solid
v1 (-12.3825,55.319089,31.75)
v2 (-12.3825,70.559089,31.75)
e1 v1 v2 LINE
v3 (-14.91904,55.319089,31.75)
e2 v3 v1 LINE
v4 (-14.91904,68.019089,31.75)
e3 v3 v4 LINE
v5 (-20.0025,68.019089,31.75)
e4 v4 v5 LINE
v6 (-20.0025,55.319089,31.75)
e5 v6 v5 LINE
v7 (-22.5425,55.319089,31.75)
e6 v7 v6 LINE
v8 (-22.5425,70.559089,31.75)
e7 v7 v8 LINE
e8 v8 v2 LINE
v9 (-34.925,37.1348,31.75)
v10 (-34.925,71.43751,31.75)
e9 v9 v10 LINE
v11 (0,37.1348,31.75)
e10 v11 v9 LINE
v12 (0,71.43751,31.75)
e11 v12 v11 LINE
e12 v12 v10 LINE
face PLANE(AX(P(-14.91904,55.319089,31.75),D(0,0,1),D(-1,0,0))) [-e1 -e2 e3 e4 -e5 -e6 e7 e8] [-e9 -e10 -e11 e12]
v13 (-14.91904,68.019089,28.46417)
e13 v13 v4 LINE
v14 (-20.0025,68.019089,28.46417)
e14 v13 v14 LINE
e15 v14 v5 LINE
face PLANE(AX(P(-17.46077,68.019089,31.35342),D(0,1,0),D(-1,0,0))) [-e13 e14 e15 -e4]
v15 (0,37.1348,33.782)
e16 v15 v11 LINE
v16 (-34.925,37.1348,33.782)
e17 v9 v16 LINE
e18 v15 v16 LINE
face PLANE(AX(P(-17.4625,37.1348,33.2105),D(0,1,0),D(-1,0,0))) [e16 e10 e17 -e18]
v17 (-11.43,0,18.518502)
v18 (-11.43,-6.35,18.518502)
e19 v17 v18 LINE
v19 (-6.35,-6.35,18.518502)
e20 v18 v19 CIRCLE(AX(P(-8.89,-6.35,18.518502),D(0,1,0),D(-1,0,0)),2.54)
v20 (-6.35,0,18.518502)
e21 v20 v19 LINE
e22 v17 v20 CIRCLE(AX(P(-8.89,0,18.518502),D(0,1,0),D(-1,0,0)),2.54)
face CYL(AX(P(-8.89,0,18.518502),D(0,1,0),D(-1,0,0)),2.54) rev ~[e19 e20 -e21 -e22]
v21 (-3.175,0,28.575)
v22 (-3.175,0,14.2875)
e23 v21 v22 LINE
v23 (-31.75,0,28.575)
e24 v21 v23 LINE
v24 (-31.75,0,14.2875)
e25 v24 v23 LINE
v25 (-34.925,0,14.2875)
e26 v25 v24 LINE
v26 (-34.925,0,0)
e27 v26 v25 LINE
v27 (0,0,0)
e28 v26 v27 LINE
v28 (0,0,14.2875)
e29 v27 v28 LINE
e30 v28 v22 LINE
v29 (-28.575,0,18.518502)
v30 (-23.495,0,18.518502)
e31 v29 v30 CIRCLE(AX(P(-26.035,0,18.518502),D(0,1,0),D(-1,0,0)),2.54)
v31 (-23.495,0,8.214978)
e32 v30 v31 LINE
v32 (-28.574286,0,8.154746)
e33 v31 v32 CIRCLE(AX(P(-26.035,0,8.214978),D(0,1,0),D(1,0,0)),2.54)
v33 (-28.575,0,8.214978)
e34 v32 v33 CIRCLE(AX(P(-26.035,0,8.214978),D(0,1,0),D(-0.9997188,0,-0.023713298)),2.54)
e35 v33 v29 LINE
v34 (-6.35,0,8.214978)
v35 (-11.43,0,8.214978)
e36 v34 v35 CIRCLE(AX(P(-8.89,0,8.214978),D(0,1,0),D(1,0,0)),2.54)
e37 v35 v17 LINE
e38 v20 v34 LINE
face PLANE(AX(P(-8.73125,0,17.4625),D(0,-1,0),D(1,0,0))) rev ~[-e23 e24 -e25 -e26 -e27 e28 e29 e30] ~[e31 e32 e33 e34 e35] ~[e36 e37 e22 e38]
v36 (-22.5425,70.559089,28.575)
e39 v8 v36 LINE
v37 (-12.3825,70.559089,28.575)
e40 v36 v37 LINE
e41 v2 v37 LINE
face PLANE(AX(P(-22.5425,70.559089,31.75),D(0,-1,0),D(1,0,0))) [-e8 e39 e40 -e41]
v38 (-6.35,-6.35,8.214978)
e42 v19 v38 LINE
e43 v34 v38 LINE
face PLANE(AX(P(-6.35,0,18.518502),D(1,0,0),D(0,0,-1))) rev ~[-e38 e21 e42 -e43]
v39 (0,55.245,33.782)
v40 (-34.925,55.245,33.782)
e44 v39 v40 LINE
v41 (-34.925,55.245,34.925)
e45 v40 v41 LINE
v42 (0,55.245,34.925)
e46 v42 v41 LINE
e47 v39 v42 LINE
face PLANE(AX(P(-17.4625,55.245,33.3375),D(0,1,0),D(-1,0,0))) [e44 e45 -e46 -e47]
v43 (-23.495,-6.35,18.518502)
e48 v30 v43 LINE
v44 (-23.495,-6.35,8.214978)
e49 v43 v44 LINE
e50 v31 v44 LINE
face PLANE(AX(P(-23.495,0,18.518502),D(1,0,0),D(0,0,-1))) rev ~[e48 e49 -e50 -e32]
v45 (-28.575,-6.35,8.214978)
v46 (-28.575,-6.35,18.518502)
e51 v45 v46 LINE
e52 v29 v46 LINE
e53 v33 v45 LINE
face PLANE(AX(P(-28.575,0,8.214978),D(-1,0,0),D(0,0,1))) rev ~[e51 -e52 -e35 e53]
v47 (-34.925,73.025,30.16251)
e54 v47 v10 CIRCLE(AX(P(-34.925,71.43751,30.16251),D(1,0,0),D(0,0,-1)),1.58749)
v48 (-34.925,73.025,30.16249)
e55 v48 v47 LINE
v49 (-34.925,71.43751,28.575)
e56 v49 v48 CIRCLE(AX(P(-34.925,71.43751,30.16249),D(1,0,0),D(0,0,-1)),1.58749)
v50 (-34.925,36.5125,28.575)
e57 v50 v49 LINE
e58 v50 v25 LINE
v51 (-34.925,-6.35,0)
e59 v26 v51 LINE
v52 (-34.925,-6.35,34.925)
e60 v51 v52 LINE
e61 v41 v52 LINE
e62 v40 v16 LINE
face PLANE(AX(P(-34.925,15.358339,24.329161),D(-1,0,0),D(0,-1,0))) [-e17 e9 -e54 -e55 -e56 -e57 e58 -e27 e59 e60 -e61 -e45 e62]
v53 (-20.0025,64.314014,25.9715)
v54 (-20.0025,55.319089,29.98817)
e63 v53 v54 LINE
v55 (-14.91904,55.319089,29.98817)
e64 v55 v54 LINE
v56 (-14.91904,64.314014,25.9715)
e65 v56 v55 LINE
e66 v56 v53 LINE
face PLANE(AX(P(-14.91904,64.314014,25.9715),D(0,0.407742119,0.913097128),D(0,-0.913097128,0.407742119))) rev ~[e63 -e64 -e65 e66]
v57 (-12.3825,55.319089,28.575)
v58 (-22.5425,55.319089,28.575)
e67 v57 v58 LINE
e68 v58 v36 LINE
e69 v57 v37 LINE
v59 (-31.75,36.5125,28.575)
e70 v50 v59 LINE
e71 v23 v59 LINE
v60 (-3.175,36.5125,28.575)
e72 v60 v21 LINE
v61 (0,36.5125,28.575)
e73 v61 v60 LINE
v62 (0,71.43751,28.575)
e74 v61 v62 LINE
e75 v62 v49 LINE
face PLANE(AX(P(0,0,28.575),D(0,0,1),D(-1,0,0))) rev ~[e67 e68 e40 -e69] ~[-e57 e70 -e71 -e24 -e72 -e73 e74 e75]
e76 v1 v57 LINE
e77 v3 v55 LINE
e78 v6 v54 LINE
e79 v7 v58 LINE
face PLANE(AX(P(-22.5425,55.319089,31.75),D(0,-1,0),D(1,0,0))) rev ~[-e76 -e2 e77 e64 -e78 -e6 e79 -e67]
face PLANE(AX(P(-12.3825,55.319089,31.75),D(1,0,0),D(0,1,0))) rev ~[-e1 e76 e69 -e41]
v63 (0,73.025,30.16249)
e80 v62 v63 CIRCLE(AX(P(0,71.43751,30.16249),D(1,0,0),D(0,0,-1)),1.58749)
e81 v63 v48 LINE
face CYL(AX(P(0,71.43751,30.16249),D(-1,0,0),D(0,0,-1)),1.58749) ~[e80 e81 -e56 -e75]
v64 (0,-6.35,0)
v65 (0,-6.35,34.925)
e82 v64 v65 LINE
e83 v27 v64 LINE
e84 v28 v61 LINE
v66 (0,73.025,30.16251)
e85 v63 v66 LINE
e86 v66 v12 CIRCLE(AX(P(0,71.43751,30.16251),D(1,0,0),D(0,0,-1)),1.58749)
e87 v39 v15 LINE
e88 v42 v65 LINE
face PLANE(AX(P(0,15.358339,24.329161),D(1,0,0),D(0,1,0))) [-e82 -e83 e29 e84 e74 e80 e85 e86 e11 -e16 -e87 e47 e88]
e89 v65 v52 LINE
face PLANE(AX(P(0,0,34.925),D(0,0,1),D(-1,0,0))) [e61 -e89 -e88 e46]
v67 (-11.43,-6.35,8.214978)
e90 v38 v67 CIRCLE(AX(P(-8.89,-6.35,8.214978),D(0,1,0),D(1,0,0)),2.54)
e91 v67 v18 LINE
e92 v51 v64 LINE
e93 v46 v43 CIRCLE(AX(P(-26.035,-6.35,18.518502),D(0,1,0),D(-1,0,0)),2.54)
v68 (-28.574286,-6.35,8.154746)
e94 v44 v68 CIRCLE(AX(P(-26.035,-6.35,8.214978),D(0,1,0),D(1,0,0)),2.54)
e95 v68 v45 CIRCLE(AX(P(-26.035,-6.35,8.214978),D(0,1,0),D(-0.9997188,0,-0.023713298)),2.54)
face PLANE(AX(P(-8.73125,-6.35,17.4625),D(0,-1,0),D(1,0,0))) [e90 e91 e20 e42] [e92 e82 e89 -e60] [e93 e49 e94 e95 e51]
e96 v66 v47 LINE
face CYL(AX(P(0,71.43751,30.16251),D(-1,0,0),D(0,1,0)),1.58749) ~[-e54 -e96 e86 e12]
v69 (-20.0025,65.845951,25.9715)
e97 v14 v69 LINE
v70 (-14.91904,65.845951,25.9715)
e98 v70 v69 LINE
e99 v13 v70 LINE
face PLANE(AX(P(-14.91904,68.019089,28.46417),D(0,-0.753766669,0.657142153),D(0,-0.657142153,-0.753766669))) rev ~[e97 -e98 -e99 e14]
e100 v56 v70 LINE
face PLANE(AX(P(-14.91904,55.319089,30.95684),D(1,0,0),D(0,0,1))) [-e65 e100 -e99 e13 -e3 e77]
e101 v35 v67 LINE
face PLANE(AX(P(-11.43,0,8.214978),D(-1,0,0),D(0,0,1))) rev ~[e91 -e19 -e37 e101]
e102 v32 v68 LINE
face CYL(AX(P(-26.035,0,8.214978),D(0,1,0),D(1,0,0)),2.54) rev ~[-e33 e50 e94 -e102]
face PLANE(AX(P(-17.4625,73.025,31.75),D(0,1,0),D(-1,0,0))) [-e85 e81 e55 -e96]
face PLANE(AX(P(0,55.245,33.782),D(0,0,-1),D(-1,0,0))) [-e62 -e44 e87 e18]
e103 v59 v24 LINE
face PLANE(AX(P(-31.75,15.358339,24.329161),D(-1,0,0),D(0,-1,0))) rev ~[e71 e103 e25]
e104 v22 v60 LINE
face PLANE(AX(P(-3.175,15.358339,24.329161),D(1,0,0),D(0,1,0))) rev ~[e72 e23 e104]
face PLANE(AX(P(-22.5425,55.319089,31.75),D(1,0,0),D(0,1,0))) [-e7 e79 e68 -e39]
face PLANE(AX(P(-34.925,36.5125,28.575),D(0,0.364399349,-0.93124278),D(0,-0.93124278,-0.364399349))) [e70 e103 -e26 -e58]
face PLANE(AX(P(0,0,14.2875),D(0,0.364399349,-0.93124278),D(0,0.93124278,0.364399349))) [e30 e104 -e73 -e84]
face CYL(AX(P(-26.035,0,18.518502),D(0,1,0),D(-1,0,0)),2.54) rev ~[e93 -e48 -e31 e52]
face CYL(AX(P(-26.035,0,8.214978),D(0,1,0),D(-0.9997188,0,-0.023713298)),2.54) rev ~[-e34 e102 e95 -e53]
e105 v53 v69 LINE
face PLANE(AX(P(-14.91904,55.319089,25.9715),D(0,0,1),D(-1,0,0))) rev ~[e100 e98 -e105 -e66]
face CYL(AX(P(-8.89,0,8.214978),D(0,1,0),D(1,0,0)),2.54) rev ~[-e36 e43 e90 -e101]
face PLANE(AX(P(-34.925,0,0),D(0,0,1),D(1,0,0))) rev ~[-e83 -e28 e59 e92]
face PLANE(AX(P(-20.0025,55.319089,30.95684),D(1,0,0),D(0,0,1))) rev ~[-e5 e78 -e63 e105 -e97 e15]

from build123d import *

# Parameters (mm, degrees)
F0_W      = 17.4625
F0_H      = 34.925
F1_DEPTH  = 6.35
F2_W      = 34.925
F2_H      = 6.35
F3_DEPTH  = 73.025
F5_DEPTH  = 3.175
F7_DEPTH  = 3.175
F8_W      = 34.925
F8_H      = 3.175
F9_DEPTH  = 17.78
F10_W     = 34.925
F10_H     = 1.143
F10_H_2   = 0.889
F11_DEPTH = 18.1102
F12_W     = 10.16
F12_H     = 15.24
F13_DEPTH = 25.4
F14_W     = 5.0834602067
F14_H     = 0.7943399184
F14_H_2   = 4.191
F15_DEPTH = 12.7
F17_DEPTH = 5.7404
F18_R     = 1.58749
F19_W     = 5.0834602067
F19_H     = 0.7931600816
F20_DEPTH = 12.7


# Not quite as in the source:
# - a fillet or chamfer is up to 0.001 mm smaller than in the source, because OpenCascade refuses the exact size
# - a feature names something its author has since deleted; it is built from what else it names


with BuildPart() as f1:
    # F0 (on Front) → F1 (new body)
    with BuildSketch(Plane.XZ):
        with Locations((-8.73125, 17.4625)):
            Rectangle(F0_W, F0_H)
        with BuildLine():
            ThreePointArc((-11.43, 18.5185023174), (-8.89, 21.0585023174), (-6.35, 18.5185023174))
            Line((-6.35, 18.5185023174), (-6.35, 8.2149775699))
            ThreePointArc((-6.35, 8.2149775699), (-8.89, 5.6749775699), (-11.43, 8.2149775699))
            Line((-11.43, 8.2149775699), (-11.43, 18.5185023174))
        make_face(mode=Mode.SUBTRACT)
        with Locations((-26.19375, 17.4625)):
            Rectangle(F0_W, F0_H)
        with BuildLine():
            Line((-23.495, 18.5185023174), (-23.495, 8.2149775699))
            ThreePointArc((-23.495, 8.2149775699), (-26.0048819907, 5.6751561381), (-28.5742857524, 8.154745786))
            ThreePointArc((-28.5742857524, 8.154745786), (-28.5748214318, 8.1848595606), (-28.575, 8.2149775699))
            Line((-28.575, 8.2149775699), (-28.575, 18.5185023174))
            ThreePointArc((-28.575, 18.5185023174), (-26.035, 21.0585023174), (-23.495, 18.5185023174))
        make_face(mode=Mode.SUBTRACT)
    extrude(amount=F1_DEPTH)

    # F2 (on face) → F3 (join)
    with BuildSketch(Plane(origin=(0, 0, 0), x_dir=(-1, 0, 0), z_dir=(0, 1, 0))):
        with Locations((17.4625, 31.75)):
            Rectangle(F2_W, F2_H)
    extrude(amount=F3_DEPTH)

    # F4 (on face) → F5 (join)
    with BuildSketch(Plane.YZ):
        Polygon((0, 28.575), (0, 14.2875), (36.5125, 28.575), align=None)
    extrude(amount=-F5_DEPTH)

    # F6 (on face) → F7 (join)
    with BuildSketch(Plane(origin=(-34.925, 0, 0), x_dir=(0, -1, 0), z_dir=(-1, 0, 0))):
        Polygon((-36.5125, 28.575), (0, 14.2875), (0, 28.575), align=None)
    extrude(amount=-F7_DEPTH)

    # F8 (on face) → F9 (cut)
    with BuildSketch(Plane(origin=(0, 73.025, 0), x_dir=(-1, 0, 0), z_dir=(0, 1, 0))):
        with Locations((17.4625, 33.3375)):
            Rectangle(F8_W, F8_H)
    extrude(amount=-F9_DEPTH, mode=Mode.SUBTRACT)

    # F10 (on face) → F11 (cut)
    with BuildSketch(Plane(origin=(0, 55.245, 0), x_dir=(-1, 0, 0), z_dir=(0, 1, 0))):
        with Locations((17.4625, 33.2105)):
            Rectangle(F10_W, F10_H)
        with Locations((17.4625, 32.1945)):
            Rectangle(F10_W, F10_H_2)
    extrude(amount=-F11_DEPTH, mode=Mode.SUBTRACT)

    # F12 (on face) → F13 (cut)
    with BuildSketch(Plane.XY.offset(31.75)):
        with Locations((-17.4625, 62.9390887916)):
            Rectangle(F12_W, F12_H)
    extrude(amount=-F13_DEPTH, mode=Mode.SUBTRACT)

    # F14 (on face) → F15 (join)
    with BuildSketch(Plane(origin=(0, 55.3190887916, 0), x_dir=(-1, 0, 0), z_dir=(0, 1, 0))):
        with Locations((17.4607698967, 30.5596699592)):
            Rectangle(F14_W, F14_H)
        with Locations((17.4607698967, 28.067)):
            Rectangle(F14_W, F14_H_2)
    extrude(amount=F15_DEPTH)

    # F16 (on face) → F17 (cut)
    with BuildSketch(Plane.YZ.offset(-14.9190397933)):
        Polygon((68.0190887916, 28.4641699592), (65.845951438, 25.9715), (67.369951438, 25.9715), (68.0190887916, 25.9715), align=None)
        Polygon((55.3190887916, 25.9715), (62.7900138497, 25.9715), (64.3140138497, 25.9715), (55.3190887916, 29.9881699592), (55.3190887916, 28.575), align=None)
    extrude(amount=-F17_DEPTH, mode=Mode.SUBTRACT)

    # F18 (radius 1.5875 in the source; OpenCascade refuses exactly that, so slightly less here)
    f18_edges = [f1.edges().sort_by_distance(p)[0] for p in [
        (-17.4625, 73.025, 31.75),
        (-17.4625, 73.025, 28.575),
    ]]
    fillet(f18_edges, radius=F18_R)

    # F19 (on face) → F20 (join)
    with BuildSketch(Plane(origin=(0, 55.3190887916, 0), x_dir=(-1, 0, 0), z_dir=(0, 1, 0))):
        with Locations((17.4607698967, 31.3534199592)):
            Rectangle(F19_W, F19_H)
    extrude(amount=F20_DEPTH)


solid = f1.part
